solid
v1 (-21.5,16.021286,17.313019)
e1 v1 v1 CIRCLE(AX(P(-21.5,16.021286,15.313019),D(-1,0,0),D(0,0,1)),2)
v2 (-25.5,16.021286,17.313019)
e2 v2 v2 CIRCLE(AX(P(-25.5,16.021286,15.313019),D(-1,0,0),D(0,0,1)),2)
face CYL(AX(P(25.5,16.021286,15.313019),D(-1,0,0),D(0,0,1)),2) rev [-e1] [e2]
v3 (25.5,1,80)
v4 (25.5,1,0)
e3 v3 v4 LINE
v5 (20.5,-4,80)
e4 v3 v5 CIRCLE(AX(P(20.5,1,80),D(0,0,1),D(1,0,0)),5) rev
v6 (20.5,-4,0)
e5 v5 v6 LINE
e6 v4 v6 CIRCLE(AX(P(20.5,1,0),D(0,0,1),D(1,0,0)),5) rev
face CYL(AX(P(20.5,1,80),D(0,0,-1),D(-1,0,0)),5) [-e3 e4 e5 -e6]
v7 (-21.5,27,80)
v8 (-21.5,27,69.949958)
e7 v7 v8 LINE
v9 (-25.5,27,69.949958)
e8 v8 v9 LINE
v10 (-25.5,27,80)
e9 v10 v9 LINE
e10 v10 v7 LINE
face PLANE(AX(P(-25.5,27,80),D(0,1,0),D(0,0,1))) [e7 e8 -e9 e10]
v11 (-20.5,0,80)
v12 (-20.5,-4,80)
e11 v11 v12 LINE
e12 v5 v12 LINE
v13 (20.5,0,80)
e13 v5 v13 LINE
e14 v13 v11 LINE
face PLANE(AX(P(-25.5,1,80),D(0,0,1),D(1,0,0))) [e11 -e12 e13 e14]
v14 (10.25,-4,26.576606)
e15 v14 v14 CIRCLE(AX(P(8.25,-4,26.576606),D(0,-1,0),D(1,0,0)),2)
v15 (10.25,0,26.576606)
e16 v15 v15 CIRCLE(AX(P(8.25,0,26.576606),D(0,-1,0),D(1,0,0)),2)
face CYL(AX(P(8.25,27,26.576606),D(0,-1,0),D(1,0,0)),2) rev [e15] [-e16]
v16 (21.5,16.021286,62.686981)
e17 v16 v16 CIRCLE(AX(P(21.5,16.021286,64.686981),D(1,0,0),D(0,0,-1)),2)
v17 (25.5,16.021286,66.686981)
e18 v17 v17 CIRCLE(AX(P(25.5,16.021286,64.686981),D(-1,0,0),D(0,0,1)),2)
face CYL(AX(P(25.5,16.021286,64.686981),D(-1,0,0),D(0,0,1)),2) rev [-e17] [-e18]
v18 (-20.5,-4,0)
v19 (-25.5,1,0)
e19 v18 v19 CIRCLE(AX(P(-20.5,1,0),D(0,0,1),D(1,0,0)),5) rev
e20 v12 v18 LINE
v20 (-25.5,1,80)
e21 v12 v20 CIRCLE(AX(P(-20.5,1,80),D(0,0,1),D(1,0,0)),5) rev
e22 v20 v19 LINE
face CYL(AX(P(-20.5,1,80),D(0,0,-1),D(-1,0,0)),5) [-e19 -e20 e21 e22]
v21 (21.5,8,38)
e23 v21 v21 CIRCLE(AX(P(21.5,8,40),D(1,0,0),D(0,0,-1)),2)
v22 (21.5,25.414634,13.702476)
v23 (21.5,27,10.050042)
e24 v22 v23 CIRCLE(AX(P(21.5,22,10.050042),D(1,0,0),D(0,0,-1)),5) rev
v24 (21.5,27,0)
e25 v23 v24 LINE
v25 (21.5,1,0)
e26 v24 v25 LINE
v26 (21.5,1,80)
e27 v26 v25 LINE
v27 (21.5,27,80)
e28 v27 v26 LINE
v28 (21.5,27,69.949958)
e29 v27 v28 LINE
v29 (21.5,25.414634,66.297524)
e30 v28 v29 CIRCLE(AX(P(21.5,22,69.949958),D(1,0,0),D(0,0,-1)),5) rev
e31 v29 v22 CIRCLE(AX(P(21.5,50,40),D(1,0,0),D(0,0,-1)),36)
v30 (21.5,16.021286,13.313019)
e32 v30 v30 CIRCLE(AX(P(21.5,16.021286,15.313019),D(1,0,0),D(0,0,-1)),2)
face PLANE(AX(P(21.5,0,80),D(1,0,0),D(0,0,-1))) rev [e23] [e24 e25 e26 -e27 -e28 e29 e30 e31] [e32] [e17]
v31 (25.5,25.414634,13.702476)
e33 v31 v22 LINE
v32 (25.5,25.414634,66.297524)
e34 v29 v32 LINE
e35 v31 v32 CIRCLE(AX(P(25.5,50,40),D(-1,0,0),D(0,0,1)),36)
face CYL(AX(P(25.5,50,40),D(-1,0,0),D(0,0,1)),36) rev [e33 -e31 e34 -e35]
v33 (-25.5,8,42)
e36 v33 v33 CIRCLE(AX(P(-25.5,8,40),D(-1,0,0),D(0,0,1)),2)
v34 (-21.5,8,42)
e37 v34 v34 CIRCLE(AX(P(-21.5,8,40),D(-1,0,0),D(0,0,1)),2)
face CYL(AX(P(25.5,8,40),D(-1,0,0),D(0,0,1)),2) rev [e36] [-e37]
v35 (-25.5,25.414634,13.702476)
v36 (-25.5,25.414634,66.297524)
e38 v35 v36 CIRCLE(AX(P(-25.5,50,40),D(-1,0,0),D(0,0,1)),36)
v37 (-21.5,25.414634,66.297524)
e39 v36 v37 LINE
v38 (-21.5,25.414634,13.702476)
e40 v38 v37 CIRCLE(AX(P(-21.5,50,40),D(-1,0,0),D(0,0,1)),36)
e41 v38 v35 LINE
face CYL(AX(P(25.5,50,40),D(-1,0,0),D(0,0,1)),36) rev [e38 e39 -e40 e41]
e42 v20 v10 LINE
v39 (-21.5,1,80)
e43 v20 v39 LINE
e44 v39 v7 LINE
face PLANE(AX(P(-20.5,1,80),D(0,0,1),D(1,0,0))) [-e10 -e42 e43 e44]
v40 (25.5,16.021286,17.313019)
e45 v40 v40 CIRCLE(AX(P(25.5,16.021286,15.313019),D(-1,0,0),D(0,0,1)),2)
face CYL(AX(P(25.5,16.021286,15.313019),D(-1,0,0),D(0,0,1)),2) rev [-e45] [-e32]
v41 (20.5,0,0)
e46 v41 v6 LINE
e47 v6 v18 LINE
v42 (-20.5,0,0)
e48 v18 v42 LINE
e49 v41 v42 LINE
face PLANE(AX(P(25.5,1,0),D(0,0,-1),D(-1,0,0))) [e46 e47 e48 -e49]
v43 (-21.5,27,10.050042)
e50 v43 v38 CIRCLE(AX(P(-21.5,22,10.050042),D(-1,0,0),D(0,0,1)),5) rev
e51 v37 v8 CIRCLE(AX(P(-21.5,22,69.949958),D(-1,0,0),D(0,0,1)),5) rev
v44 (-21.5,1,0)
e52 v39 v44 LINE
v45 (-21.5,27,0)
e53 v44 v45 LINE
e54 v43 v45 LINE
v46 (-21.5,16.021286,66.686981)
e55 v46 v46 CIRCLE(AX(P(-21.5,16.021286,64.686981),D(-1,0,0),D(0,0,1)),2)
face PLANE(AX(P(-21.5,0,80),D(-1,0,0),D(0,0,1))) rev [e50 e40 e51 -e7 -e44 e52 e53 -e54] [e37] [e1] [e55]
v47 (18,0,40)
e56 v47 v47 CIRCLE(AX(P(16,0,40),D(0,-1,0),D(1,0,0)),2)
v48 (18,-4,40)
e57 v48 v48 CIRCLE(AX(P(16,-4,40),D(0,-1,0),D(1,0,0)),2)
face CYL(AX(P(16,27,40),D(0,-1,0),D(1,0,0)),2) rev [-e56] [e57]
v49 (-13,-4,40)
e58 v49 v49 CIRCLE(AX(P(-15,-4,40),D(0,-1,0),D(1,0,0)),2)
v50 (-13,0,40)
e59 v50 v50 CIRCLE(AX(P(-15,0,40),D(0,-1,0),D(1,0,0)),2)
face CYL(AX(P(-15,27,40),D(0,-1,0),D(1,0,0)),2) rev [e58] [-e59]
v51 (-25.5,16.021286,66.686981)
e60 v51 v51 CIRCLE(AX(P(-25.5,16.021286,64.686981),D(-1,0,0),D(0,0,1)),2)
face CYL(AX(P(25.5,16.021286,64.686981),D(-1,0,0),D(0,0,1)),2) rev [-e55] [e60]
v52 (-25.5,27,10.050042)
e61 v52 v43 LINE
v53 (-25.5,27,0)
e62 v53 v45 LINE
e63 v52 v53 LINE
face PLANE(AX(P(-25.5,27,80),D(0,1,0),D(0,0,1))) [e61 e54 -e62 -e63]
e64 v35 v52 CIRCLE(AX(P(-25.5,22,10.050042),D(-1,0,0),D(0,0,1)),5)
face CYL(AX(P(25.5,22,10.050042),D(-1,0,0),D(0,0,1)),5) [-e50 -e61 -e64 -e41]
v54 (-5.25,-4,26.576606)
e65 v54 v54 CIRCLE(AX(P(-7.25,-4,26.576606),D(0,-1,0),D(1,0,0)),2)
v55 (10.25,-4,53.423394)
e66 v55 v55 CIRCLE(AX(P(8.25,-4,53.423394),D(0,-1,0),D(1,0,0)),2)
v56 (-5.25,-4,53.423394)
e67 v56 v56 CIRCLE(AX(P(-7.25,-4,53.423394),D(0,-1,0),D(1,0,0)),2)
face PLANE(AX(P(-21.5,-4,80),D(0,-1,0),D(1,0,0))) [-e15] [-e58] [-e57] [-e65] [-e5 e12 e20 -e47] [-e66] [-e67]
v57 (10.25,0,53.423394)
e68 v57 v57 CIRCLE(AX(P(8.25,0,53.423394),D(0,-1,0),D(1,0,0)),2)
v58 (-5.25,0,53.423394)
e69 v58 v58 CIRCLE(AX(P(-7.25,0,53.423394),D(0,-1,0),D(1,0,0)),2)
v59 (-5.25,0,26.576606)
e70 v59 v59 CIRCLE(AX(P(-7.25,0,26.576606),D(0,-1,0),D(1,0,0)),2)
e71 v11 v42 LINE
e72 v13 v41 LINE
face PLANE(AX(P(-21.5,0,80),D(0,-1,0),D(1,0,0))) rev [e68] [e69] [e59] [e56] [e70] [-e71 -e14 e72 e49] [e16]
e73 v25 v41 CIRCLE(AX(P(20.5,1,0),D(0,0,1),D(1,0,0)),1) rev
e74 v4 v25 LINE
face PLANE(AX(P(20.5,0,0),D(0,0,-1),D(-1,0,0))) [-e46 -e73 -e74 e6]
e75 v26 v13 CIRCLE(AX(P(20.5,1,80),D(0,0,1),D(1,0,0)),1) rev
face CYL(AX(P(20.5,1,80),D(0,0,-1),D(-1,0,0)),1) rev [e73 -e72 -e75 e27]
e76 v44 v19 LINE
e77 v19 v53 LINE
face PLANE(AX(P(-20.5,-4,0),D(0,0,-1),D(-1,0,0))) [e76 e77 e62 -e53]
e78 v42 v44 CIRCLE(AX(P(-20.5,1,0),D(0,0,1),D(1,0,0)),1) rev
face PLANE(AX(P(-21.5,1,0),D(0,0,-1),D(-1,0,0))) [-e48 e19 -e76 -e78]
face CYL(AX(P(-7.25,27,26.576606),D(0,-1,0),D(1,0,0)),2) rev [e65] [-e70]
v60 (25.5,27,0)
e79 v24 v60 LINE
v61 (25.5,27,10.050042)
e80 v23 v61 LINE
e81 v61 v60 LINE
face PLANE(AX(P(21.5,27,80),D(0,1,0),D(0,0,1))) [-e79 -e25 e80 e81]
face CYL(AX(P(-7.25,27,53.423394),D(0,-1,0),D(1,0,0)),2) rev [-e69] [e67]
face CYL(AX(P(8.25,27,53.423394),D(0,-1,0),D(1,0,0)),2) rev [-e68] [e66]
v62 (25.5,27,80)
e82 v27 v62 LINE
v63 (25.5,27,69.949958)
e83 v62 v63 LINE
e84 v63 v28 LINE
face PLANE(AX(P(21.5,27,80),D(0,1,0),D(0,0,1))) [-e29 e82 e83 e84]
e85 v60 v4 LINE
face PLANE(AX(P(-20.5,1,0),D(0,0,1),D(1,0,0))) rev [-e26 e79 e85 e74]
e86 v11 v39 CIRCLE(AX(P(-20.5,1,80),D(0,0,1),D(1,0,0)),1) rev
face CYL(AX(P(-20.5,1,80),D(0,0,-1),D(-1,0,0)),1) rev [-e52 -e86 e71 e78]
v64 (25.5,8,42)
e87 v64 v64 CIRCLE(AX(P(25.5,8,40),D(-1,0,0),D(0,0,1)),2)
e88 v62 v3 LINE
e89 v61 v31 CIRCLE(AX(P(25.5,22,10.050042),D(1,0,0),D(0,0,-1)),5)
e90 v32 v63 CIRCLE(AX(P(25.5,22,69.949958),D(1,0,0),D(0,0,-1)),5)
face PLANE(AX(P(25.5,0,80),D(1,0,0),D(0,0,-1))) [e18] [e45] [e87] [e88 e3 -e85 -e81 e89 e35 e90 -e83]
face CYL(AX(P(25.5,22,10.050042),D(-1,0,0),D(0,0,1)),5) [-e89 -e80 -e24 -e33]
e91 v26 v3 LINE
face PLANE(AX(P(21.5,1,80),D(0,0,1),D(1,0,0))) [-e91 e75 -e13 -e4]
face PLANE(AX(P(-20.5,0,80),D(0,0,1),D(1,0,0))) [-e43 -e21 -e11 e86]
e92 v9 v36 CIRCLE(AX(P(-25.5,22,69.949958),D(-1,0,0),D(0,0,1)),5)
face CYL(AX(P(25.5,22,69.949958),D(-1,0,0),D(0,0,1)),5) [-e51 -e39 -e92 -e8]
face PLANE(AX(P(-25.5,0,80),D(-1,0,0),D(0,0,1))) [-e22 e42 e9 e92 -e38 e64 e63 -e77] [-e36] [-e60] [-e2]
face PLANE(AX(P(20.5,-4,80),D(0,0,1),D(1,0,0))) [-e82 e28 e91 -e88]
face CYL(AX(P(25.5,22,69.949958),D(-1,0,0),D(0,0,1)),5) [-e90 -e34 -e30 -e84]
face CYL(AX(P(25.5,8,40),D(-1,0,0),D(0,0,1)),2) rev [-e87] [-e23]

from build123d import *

# Parameters (mm, degrees)
SM_BASE_FLANGE_1_DEPTH   = 80
CUT_EXTRUDE_3_DEPTH      = 99.640762365
CUT_EXTRUDE_3_DEPTH_BACK = 99.640762365
SKETCH_6_R               = 36
SKETCH_6_R_2             = 2
FILLET_1_R               = 5
SKETCH_9_R               = 2
CUT_EXTRUDE_4_DEPTH      = 90.505586418


# Sheet-metal steps are written as plain solids
with BuildPart() as part:
    # Sketch 1 → Базовая кромка1 (new body)
    with BuildSketch(Plane.XY):
        with BuildLine():
            Line((-21.5, 27), (-21.5, 1))
            ThreePointArc((-21.5, 1), (-21.207106781, 0.292893219), (-20.5, 0))
            Line((-20.5, 0), (20.5, 0))
            ThreePointArc((20.5, 0), (21.207106781, 0.292893219), (21.5, 1))
            Line((21.5, 1), (21.5, 27))
            Line((21.5, 27), (25.5, 27))
            Line((25.5, 27), (25.5, 1))
            ThreePointArc((25.5, 1), (24.035533906, -2.535533906), (20.5, -4))
            Line((20.5, -4), (-20.5, -4))
            ThreePointArc((-20.5, -4), (-24.035533906, -2.535533906), (-25.5, 1))
            Line((-25.5, 1), (-25.5, 27))
            Line((-25.5, 27), (-21.5, 27))
        make_face()
    extrude(amount=SM_BASE_FLANGE_1_DEPTH)

    # Эскиз6 → Вырез-Вытянуть3 (cut, two sides: drawn at the far end of the back side and taken through both)
    with BuildSketch(Plane.ZY.offset(25.5).offset(-CUT_EXTRUDE_3_DEPTH_BACK)):
        with Locations((40, 50)):
            Circle(SKETCH_6_R)
        with Locations((40, 8)):
            Circle(SKETCH_6_R_2)
        with Locations((15.313019404, 16.021286236)):
            Circle(SKETCH_6_R_2)
        with Locations((64.686980596, 16.021286236)):
            Circle(SKETCH_6_R_2)
    extrude(amount=CUT_EXTRUDE_3_DEPTH + CUT_EXTRUDE_3_DEPTH_BACK, mode=Mode.SUBTRACT)

    # Скругление1
    fillet_1_edges = [part.edges().sort_by_distance(p)[0] for p in [
        (23.5, 27, 12.305235152),
        (23.5, 27, 67.694764848),
        (-23.5, 27, 12.305235152),
        (-23.5, 27, 67.694764848),
    ]]
    fillet(fillet_1_edges, radius=FILLET_1_R)

    # Эскиз9 → Вырез-Вытянуть4 (cut, through all)
    with BuildSketch(Plane.XZ.offset(4)):
        with Locations((16, 40)):
            Circle(SKETCH_9_R)
        with Locations((8.25, 26.576606241)):
            Circle(SKETCH_9_R)
        with Locations((-7.25, 26.576606241)):
            Circle(SKETCH_9_R)
        with Locations((-15, 40)):
            Circle(SKETCH_9_R)
        with Locations((-7.25, 53.423393759)):
            Circle(SKETCH_9_R)
        with Locations((8.25, 53.423393759)):
            Circle(SKETCH_9_R)
    extrude(amount=-CUT_EXTRUDE_4_DEPTH, mode=Mode.SUBTRACT)


solid = part.part
